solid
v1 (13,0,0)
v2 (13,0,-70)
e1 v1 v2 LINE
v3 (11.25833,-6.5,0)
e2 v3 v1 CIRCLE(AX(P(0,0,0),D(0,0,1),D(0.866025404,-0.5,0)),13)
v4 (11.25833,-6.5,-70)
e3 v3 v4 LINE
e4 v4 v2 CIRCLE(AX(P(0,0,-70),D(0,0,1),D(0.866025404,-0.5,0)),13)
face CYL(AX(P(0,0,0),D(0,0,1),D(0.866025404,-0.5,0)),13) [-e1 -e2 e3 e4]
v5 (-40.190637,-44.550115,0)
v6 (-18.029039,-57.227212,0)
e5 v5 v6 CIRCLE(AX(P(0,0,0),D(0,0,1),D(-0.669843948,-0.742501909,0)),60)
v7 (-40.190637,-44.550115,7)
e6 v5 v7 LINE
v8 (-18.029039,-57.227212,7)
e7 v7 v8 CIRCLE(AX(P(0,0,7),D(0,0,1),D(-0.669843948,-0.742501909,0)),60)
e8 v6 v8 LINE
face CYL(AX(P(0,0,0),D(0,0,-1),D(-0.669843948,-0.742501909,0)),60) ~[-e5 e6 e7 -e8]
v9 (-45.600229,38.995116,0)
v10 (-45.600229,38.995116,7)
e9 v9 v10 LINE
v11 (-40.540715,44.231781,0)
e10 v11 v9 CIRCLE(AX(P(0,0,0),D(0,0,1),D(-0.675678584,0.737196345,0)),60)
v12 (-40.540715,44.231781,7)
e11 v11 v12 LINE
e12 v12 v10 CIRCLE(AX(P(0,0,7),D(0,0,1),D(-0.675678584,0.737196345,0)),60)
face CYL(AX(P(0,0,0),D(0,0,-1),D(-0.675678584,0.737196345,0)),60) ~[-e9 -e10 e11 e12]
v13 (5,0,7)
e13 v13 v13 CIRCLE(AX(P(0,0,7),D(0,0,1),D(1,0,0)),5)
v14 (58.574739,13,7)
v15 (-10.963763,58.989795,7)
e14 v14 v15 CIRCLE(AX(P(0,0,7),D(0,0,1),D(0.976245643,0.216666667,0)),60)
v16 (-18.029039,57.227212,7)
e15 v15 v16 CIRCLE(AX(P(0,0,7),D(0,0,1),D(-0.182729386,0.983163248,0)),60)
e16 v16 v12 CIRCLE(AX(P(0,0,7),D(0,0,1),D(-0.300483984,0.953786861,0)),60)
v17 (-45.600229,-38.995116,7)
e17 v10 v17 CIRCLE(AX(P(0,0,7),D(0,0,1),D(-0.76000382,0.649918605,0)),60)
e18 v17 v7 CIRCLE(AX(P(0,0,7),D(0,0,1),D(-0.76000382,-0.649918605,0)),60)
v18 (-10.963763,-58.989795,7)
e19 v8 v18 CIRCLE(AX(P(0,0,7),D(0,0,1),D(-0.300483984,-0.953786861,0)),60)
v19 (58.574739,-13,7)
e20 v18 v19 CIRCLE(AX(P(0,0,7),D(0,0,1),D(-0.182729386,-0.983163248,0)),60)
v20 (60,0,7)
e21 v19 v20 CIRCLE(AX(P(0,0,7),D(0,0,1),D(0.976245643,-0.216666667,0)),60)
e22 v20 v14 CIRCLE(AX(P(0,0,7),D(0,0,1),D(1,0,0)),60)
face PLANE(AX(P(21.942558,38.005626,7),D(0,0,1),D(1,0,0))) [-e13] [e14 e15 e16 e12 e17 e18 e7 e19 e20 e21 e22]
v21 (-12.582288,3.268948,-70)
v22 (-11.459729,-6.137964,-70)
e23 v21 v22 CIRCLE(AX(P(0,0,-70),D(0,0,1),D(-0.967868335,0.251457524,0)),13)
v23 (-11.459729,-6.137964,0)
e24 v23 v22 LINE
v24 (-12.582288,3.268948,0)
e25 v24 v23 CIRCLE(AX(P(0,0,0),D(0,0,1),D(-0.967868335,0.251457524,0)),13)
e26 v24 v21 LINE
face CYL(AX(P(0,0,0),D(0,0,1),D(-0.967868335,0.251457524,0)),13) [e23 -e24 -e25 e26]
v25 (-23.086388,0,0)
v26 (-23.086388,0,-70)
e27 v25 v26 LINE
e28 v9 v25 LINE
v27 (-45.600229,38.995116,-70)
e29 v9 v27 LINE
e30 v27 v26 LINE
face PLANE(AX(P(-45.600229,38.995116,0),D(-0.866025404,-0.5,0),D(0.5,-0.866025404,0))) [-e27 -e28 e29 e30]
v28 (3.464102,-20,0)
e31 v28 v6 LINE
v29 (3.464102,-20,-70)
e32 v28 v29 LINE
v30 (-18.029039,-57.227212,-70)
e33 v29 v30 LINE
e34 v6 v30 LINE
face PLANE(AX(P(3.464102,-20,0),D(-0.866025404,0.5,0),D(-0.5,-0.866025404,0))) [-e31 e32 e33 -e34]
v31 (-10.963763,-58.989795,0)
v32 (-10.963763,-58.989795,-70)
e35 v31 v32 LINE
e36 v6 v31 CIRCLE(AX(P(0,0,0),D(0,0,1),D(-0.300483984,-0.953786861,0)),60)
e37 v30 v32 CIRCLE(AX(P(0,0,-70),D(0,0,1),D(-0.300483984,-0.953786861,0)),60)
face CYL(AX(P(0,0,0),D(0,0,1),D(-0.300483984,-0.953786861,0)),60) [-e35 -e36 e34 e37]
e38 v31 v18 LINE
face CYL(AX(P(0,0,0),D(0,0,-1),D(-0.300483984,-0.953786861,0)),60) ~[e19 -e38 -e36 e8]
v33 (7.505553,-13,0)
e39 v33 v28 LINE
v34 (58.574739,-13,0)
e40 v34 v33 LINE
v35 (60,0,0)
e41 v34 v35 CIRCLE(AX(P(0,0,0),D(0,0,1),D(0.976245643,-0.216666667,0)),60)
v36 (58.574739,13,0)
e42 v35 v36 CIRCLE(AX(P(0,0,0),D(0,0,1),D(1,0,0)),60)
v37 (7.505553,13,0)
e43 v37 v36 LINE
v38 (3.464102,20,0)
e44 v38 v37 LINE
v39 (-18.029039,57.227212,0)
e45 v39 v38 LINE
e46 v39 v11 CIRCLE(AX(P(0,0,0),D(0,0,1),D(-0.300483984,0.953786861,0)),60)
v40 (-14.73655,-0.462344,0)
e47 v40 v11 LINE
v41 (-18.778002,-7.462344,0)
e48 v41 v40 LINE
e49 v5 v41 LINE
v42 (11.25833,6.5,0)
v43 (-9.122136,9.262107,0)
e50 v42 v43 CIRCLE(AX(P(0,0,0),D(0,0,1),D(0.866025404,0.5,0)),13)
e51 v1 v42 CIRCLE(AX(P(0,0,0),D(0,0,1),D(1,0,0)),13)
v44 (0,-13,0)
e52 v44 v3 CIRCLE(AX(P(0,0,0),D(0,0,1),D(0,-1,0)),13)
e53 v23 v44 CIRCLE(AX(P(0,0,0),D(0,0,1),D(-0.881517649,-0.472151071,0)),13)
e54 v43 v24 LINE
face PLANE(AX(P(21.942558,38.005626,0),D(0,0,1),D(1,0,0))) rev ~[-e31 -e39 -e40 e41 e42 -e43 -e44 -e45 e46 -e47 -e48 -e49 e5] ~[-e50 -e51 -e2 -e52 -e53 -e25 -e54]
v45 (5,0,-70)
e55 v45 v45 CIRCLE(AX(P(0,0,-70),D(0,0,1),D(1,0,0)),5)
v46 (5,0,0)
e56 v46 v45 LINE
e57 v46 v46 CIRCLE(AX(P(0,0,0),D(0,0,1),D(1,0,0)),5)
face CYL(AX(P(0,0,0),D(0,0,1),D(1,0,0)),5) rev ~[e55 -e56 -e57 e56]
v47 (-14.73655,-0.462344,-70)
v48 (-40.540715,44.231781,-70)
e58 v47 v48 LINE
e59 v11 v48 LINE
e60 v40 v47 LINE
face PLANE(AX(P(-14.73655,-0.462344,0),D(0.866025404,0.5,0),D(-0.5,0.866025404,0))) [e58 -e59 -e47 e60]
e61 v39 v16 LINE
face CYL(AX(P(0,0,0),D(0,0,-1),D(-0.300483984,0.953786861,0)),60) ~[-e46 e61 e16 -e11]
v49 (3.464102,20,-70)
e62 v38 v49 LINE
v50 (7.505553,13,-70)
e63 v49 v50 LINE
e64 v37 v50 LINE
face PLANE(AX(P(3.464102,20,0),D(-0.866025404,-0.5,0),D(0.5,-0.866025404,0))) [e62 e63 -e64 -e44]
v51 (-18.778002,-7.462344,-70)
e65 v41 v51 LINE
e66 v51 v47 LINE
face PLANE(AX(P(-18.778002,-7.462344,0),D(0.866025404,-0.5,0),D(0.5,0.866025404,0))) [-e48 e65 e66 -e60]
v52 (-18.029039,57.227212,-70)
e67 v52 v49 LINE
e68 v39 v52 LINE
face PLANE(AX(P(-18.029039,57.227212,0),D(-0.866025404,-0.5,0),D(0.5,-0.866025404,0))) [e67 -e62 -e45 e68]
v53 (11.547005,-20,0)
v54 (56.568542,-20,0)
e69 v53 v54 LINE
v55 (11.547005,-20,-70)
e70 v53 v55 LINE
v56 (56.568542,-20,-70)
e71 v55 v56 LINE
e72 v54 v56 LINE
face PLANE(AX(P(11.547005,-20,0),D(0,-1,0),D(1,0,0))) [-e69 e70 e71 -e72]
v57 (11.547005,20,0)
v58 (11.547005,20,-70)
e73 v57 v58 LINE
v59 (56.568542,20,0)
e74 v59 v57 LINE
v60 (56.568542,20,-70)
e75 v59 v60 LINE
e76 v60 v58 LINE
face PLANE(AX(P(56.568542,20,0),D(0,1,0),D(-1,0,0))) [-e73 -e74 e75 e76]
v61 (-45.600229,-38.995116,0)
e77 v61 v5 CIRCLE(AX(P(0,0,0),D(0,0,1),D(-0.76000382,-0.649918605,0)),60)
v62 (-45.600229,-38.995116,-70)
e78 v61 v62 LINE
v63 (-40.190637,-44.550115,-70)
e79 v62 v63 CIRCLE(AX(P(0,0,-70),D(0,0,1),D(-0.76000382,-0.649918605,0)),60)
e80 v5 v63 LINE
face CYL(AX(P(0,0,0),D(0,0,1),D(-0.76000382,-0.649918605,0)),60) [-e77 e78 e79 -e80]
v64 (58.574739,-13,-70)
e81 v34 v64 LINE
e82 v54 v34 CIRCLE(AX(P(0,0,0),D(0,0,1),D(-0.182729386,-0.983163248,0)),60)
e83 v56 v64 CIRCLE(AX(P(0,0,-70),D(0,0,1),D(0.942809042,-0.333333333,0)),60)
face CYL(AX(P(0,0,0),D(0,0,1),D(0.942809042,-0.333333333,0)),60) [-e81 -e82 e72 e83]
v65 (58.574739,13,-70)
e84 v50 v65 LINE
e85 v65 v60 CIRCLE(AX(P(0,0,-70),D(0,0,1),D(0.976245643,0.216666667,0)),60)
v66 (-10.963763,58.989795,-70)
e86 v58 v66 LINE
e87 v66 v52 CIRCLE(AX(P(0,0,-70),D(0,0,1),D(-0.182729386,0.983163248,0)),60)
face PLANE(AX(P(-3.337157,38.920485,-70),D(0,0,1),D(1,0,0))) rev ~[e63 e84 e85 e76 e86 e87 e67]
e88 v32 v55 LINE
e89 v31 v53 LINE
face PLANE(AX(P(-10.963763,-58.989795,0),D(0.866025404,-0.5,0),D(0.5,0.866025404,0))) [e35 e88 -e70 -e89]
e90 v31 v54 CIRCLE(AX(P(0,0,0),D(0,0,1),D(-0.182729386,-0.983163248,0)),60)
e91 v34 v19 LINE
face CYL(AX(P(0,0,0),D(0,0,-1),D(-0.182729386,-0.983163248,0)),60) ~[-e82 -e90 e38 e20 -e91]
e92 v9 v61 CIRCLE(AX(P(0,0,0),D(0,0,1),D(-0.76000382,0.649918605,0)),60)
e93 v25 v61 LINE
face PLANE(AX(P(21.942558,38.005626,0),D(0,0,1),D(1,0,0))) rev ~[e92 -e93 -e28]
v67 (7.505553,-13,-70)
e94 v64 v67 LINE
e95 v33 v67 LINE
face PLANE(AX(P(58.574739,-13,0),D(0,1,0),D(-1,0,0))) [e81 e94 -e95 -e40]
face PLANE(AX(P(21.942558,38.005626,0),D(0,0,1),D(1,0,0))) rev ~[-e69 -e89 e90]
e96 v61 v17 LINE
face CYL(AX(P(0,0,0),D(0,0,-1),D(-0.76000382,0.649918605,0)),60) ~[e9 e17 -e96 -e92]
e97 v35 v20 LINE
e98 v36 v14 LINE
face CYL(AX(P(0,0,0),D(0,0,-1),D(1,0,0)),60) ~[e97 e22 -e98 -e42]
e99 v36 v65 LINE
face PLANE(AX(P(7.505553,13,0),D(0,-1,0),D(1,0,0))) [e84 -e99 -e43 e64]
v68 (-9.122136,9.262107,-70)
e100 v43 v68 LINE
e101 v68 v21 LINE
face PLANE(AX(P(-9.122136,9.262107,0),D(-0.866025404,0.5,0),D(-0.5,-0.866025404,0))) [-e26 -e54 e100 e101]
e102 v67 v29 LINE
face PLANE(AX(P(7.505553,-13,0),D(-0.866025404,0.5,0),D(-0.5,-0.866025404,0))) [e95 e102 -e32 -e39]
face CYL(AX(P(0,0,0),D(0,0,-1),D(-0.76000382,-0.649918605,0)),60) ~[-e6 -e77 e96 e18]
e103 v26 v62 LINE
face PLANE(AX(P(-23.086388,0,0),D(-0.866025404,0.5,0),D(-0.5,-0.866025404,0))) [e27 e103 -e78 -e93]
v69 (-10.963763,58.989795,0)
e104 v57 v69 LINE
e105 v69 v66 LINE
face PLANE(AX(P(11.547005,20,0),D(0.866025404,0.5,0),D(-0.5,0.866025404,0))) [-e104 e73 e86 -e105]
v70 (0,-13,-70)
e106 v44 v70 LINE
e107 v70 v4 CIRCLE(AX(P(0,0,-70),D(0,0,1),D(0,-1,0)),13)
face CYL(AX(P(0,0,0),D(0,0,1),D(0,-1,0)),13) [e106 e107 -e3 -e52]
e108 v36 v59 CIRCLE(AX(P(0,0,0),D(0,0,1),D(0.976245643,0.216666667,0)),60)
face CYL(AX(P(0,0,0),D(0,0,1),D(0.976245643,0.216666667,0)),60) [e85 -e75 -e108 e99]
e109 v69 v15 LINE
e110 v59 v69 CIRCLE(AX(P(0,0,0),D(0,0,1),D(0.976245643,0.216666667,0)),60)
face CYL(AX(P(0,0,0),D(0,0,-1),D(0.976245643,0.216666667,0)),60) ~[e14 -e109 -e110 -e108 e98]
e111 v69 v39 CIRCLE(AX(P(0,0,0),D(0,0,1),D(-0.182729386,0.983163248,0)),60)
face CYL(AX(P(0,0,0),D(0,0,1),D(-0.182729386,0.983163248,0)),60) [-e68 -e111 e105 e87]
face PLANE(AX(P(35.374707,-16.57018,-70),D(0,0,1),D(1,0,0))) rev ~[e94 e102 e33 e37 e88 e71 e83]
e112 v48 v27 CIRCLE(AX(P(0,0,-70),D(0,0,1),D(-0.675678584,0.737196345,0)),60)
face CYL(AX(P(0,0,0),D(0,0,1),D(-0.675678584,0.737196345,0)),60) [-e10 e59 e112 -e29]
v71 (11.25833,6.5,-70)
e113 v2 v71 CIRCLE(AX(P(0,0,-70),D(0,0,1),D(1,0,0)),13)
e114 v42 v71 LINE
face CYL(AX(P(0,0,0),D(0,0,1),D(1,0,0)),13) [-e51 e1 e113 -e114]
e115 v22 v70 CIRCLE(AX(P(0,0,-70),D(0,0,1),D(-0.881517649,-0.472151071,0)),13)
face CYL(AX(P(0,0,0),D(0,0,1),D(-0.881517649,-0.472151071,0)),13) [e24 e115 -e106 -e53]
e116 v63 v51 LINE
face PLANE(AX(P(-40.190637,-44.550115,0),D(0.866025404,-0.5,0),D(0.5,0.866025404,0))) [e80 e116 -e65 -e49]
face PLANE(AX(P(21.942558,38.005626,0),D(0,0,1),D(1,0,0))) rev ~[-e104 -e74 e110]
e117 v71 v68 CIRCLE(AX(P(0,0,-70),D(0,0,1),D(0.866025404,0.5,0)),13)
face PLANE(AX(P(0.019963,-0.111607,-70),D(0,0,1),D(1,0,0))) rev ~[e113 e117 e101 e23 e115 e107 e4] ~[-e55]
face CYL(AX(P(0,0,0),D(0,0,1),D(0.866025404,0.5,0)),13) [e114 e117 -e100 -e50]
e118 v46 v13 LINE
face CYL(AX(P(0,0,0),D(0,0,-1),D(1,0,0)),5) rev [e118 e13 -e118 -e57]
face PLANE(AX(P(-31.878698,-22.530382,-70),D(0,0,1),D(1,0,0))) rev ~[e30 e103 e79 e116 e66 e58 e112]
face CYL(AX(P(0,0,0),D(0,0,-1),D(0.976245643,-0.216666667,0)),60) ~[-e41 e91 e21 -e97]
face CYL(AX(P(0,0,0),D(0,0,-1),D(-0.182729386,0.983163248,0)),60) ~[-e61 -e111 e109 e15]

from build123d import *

# Parameters (mm, degrees)
F0_R     = 5
F1_DEPTH = 7
F2_DEPTH = 70


# Not quite as in the source:
# - after a boolean that leaves OpenCascade's solid faulty, fix() repairs it


with BuildPart() as f1:
    # F0 (on Top) → F1 (new body)
    with BuildSketch(Plane.XY):
        with BuildLine():
            Line((11.5470053838, 20), (56.5685424949, 20))
            ThreePointArc((56.5685424949, 20), (30, 51.9615242271), (-10.9637631718, 58.9897948557))
            Line((-10.9637631718, 58.9897948557), (11.5470053838, 20))
        make_face()
        with BuildLine():
            ThreePointArc((-10.9637631718, -58.9897948557), (30, -51.9615242271), (56.5685424949, -20))
            Line((56.5685424949, -20), (11.5470053838, -20))
            Line((11.5470053838, -20), (-10.9637631718, -58.9897948557))
        make_face()
        with BuildLine():
            ThreePointArc((58.5747385824, -13), (59.6426203103, -6.5389481208), (60, 0))
            ThreePointArc((60, 0), (59.6426203103, 6.5389481208), (58.5747385824, 13))
            Line((58.5747385824, 13), (15.5884572681, 13))
            Line((15.5884572681, 13), (7.5055534995, 13))
            Line((7.5055534995, 13), (11.2583302492, 6.5))
            ThreePointArc((11.2583302492, 6.5), (12.5570357418, 3.3646475863), (13, 0))
            ThreePointArc((13, 0), (12.5570357418, -3.3646475863), (11.2583302492, -6.5))
            Line((11.2583302492, -6.5), (7.5055534995, -13))
            Line((7.5055534995, -13), (15.5884572681, -13))
            Line((15.5884572681, -13), (58.5747385824, -13))
        make_face()
        with BuildLine():
            ThreePointArc((56.5685424949, -20), (57.6779316057, -16.5304629604), (58.5747385824, -13))
            Line((58.5747385824, -13), (15.5884572681, -13))
            Line((15.5884572681, -13), (11.5470053838, -20))
            Line((11.5470053838, -20), (56.5685424949, -20))
        make_face()
        with BuildLine():
            Line((15.5884572681, 13), (58.5747385824, 13))
            ThreePointArc((58.5747385824, 13), (57.6779316057, 16.5304629604), (56.5685424949, 20))
            Line((56.5685424949, 20), (11.5470053838, 20))
            Line((11.5470053838, 20), (15.5884572681, 13))
        make_face()
        with BuildLine():
            Line((3.4641016151, -20), (7.5055534995, -13))
            Line((7.5055534995, -13), (0, -13))
            ThreePointArc((0, -13), (-6.6785653008, -11.1533297953), (-11.4597294399, -6.1379639265))
            Line((-11.4597294399, -6.1379639265), (-14.736550409, -0.4623435209))
            Line((-14.736550409, -0.4623435209), (-18.7780022933, -7.4623435209))
            Line((-18.7780022933, -7.4623435209), (-40.1906368837, -44.5501145553))
            ThreePointArc((-40.1906368837, -44.5501145553), (-29.7919429343, -52.081091926), (-18.029039042, -57.2272116324))
            Line((-18.029039042, -57.2272116324), (3.4641016151, -20))
        make_face()
        with BuildLine():
            Line((-14.736550409, -0.4623435209), (-40.5407150531, 44.2317806897))
            ThreePointArc((-40.5407150531, 44.2317806897), (-43.1499853268, 41.6902718424), (-45.6002292233, 38.995116294))
            Line((-45.6002292233, 38.995116294), (-23.0863883339, 0))
            Line((-23.0863883339, 0), (-18.7780022933, -7.4623435209))
            Line((-18.7780022933, -7.4623435209), (-14.736550409, -0.4623435209))
        make_face()
        with BuildLine():
            Line((0, 13), (7.5055534995, 13))
            Line((7.5055534995, 13), (3.4641016151, 20))
            Line((3.4641016151, 20), (-18.029039042, 57.2272116324))
            ThreePointArc((-18.029039042, 57.2272116324), (-29.9970720244, 51.9632145846), (-40.5407150531, 44.2317806897))
            Line((-40.5407150531, 44.2317806897), (-14.736550409, -0.4623435209))
            Line((-14.736550409, -0.4623435209), (-12.5822883529, 3.2689478131))
            ThreePointArc((-12.5822883529, 3.2689478131), (-11.2583302492, 6.5), (-9.1221360262, 9.2621074448))
            ThreePointArc((-9.1221360262, 9.2621074448), (-4.9291278751, 12.0292850324), (0, 13))
        make_face()
        with BuildLine():
            Line((-23.0863883339, 0), (-45.6002292233, 38.995116294))
            ThreePointArc((-45.6002292233, 38.995116294), (-60, 0), (-45.6002292233, -38.995116294))
            Line((-45.6002292233, -38.995116294), (-23.0863883339, 0))
        make_face()
        with BuildLine():
            Line((11.5470053838, 20), (-10.9637631718, 58.9897948557))
            ThreePointArc((-10.9637631718, 58.9897948557), (-14.5231649428, 58.2157854885), (-18.029039042, 57.2272116324))
            Line((-18.029039042, 57.2272116324), (3.4641016151, 20))
            Line((3.4641016151, 20), (11.5470053838, 20))
        make_face()
        with BuildLine():
            ThreePointArc((-45.6002292233, -38.995116294), (-42.9852611748, -41.8600922328), (-40.1906368837, -44.5501145553))
            Line((-40.1906368837, -44.5501145553), (-18.7780022933, -7.4623435209))
            Line((-18.7780022933, -7.4623435209), (-23.0863883339, 0))
            Line((-23.0863883339, 0), (-45.6002292233, -38.995116294))
        make_face()
        with BuildLine():
            ThreePointArc((-18.029039042, -57.2272116324), (-14.5231649428, -58.2157854885), (-10.9637631718, -58.9897948557))
            Line((-10.9637631718, -58.9897948557), (11.5470053838, -20))
            Line((11.5470053838, -20), (3.4641016151, -20))
            Line((3.4641016151, -20), (-18.029039042, -57.2272116324))
        make_face()
        Polygon((11.5470053838, -20), (15.5884572681, -13), (7.5055534995, -13), (3.4641016151, -20), align=None)
        Polygon((7.5055534995, 13), (15.5884572681, 13), (11.5470053838, 20), (3.4641016151, 20), align=None)
        with BuildLine():
            Line((0, -13), (7.5055534995, -13))
            Line((7.5055534995, -13), (11.2583302492, -6.5))
            ThreePointArc((11.2583302492, -6.5), (6.5, -11.2583302492), (0, -13))
        make_face()
        with BuildLine():
            Line((-12.5822883529, 3.2689478131), (-9.1221360262, 9.2621074448))
            ThreePointArc((-9.1221360262, 9.2621074448), (-11.2583302492, 6.5), (-12.5822883529, 3.2689478131))
        make_face()
        with BuildLine():
            Line((11.2583302492, 6.5), (7.5055534995, 13))
            Line((7.5055534995, 13), (0, 13))
            ThreePointArc((0, 13), (6.5, 11.2583302492), (11.2583302492, 6.5))
        make_face()
        with BuildLine():
            Line((-14.736550409, -0.4623435209), (-11.4597294399, -6.1379639265))
            ThreePointArc((-11.4597294399, -6.1379639265), (-12.9084140005, -1.5404051392), (-12.5822883529, 3.2689478131))
            Line((-12.5822883529, 3.2689478131), (-14.736550409, -0.4623435209))
        make_face()
        with BuildLine():
            ThreePointArc((11.2583302492, 6.5), (6.5, 11.2583302492), (0, 13))
            ThreePointArc((0, 13), (-4.9291278751, 12.0292850324), (-9.1221360262, 9.2621074448))
            Line((-9.1221360262, 9.2621074448), (-12.5822883529, 3.2689478131))
            ThreePointArc((-12.5822883529, 3.2689478131), (-12.9084140005, -1.5404051392), (-11.4597294399, -6.1379639265))
            ThreePointArc((-11.4597294399, -6.1379639265), (-6.6785653008, -11.1533297953), (0, -13))
            ThreePointArc((0, -13), (6.5, -11.2583302492), (11.2583302492, -6.5))
            ThreePointArc((11.2583302492, -6.5), (12.5570357418, -3.3646475863), (13, 0))
            ThreePointArc((13, 0), (12.5570357418, 3.3646475863), (11.2583302492, 6.5))
        make_face()
        Circle(F0_R, mode=Mode.SUBTRACT)
    extrude(amount=F1_DEPTH)

    # F0 (on Top) → F2 (join)
    with BuildSketch(Plane.XY):
        with BuildLine():
            ThreePointArc((56.5685424949, -20), (57.6779316057, -16.5304629604), (58.5747385824, -13))
            Line((58.5747385824, -13), (15.5884572681, -13))
            Line((15.5884572681, -13), (11.5470053838, -20))
            Line((11.5470053838, -20), (56.5685424949, -20))
        make_face()
        Polygon((11.5470053838, -20), (15.5884572681, -13), (7.5055534995, -13), (3.4641016151, -20), align=None)
        with BuildLine():
            ThreePointArc((-18.029039042, -57.2272116324), (-14.5231649428, -58.2157854885), (-10.9637631718, -58.9897948557))
            Line((-10.9637631718, -58.9897948557), (11.5470053838, -20))
            Line((11.5470053838, -20), (3.4641016151, -20))
            Line((3.4641016151, -20), (-18.029039042, -57.2272116324))
        make_face()
        with BuildLine():
            ThreePointArc((-45.6002292233, -38.995116294), (-42.9852611748, -41.8600922328), (-40.1906368837, -44.5501145553))
            Line((-40.1906368837, -44.5501145553), (-18.7780022933, -7.4623435209))
            Line((-18.7780022933, -7.4623435209), (-23.0863883339, 0))
            Line((-23.0863883339, 0), (-45.6002292233, -38.995116294))
        make_face()
        with BuildLine():
            Line((-14.736550409, -0.4623435209), (-40.5407150531, 44.2317806897))
            ThreePointArc((-40.5407150531, 44.2317806897), (-43.1499853268, 41.6902718424), (-45.6002292233, 38.995116294))
            Line((-45.6002292233, 38.995116294), (-23.0863883339, 0))
            Line((-23.0863883339, 0), (-18.7780022933, -7.4623435209))
            Line((-18.7780022933, -7.4623435209), (-14.736550409, -0.4623435209))
        make_face()
        with BuildLine():
            Line((11.5470053838, 20), (-10.9637631718, 58.9897948557))
            ThreePointArc((-10.9637631718, 58.9897948557), (-14.5231649428, 58.2157854885), (-18.029039042, 57.2272116324))
            Line((-18.029039042, 57.2272116324), (3.4641016151, 20))
            Line((3.4641016151, 20), (11.5470053838, 20))
        make_face()
        Polygon((7.5055534995, 13), (15.5884572681, 13), (11.5470053838, 20), (3.4641016151, 20), align=None)
        with BuildLine():
            Line((15.5884572681, 13), (58.5747385824, 13))
            ThreePointArc((58.5747385824, 13), (57.6779316057, 16.5304629604), (56.5685424949, 20))
            Line((56.5685424949, 20), (11.5470053838, 20))
            Line((11.5470053838, 20), (15.5884572681, 13))
        make_face()
        with BuildLine():
            ThreePointArc((11.2583302492, 6.5), (6.5, 11.2583302492), (0, 13))
            ThreePointArc((0, 13), (-4.9291278751, 12.0292850324), (-9.1221360262, 9.2621074448))
            Line((-9.1221360262, 9.2621074448), (-12.5822883529, 3.2689478131))
            ThreePointArc((-12.5822883529, 3.2689478131), (-12.9084140005, -1.5404051392), (-11.4597294399, -6.1379639265))
            ThreePointArc((-11.4597294399, -6.1379639265), (-6.6785653008, -11.1533297953), (0, -13))
            ThreePointArc((0, -13), (6.5, -11.2583302492), (11.2583302492, -6.5))
            ThreePointArc((11.2583302492, -6.5), (12.5570357418, -3.3646475863), (13, 0))
            ThreePointArc((13, 0), (12.5570357418, 3.3646475863), (11.2583302492, 6.5))
        make_face()
        Circle(F0_R, mode=Mode.SUBTRACT)
    extrude(amount=-F2_DEPTH)

    add(f1.part.fix(), mode=Mode.REPLACE)


solid = f1.part
